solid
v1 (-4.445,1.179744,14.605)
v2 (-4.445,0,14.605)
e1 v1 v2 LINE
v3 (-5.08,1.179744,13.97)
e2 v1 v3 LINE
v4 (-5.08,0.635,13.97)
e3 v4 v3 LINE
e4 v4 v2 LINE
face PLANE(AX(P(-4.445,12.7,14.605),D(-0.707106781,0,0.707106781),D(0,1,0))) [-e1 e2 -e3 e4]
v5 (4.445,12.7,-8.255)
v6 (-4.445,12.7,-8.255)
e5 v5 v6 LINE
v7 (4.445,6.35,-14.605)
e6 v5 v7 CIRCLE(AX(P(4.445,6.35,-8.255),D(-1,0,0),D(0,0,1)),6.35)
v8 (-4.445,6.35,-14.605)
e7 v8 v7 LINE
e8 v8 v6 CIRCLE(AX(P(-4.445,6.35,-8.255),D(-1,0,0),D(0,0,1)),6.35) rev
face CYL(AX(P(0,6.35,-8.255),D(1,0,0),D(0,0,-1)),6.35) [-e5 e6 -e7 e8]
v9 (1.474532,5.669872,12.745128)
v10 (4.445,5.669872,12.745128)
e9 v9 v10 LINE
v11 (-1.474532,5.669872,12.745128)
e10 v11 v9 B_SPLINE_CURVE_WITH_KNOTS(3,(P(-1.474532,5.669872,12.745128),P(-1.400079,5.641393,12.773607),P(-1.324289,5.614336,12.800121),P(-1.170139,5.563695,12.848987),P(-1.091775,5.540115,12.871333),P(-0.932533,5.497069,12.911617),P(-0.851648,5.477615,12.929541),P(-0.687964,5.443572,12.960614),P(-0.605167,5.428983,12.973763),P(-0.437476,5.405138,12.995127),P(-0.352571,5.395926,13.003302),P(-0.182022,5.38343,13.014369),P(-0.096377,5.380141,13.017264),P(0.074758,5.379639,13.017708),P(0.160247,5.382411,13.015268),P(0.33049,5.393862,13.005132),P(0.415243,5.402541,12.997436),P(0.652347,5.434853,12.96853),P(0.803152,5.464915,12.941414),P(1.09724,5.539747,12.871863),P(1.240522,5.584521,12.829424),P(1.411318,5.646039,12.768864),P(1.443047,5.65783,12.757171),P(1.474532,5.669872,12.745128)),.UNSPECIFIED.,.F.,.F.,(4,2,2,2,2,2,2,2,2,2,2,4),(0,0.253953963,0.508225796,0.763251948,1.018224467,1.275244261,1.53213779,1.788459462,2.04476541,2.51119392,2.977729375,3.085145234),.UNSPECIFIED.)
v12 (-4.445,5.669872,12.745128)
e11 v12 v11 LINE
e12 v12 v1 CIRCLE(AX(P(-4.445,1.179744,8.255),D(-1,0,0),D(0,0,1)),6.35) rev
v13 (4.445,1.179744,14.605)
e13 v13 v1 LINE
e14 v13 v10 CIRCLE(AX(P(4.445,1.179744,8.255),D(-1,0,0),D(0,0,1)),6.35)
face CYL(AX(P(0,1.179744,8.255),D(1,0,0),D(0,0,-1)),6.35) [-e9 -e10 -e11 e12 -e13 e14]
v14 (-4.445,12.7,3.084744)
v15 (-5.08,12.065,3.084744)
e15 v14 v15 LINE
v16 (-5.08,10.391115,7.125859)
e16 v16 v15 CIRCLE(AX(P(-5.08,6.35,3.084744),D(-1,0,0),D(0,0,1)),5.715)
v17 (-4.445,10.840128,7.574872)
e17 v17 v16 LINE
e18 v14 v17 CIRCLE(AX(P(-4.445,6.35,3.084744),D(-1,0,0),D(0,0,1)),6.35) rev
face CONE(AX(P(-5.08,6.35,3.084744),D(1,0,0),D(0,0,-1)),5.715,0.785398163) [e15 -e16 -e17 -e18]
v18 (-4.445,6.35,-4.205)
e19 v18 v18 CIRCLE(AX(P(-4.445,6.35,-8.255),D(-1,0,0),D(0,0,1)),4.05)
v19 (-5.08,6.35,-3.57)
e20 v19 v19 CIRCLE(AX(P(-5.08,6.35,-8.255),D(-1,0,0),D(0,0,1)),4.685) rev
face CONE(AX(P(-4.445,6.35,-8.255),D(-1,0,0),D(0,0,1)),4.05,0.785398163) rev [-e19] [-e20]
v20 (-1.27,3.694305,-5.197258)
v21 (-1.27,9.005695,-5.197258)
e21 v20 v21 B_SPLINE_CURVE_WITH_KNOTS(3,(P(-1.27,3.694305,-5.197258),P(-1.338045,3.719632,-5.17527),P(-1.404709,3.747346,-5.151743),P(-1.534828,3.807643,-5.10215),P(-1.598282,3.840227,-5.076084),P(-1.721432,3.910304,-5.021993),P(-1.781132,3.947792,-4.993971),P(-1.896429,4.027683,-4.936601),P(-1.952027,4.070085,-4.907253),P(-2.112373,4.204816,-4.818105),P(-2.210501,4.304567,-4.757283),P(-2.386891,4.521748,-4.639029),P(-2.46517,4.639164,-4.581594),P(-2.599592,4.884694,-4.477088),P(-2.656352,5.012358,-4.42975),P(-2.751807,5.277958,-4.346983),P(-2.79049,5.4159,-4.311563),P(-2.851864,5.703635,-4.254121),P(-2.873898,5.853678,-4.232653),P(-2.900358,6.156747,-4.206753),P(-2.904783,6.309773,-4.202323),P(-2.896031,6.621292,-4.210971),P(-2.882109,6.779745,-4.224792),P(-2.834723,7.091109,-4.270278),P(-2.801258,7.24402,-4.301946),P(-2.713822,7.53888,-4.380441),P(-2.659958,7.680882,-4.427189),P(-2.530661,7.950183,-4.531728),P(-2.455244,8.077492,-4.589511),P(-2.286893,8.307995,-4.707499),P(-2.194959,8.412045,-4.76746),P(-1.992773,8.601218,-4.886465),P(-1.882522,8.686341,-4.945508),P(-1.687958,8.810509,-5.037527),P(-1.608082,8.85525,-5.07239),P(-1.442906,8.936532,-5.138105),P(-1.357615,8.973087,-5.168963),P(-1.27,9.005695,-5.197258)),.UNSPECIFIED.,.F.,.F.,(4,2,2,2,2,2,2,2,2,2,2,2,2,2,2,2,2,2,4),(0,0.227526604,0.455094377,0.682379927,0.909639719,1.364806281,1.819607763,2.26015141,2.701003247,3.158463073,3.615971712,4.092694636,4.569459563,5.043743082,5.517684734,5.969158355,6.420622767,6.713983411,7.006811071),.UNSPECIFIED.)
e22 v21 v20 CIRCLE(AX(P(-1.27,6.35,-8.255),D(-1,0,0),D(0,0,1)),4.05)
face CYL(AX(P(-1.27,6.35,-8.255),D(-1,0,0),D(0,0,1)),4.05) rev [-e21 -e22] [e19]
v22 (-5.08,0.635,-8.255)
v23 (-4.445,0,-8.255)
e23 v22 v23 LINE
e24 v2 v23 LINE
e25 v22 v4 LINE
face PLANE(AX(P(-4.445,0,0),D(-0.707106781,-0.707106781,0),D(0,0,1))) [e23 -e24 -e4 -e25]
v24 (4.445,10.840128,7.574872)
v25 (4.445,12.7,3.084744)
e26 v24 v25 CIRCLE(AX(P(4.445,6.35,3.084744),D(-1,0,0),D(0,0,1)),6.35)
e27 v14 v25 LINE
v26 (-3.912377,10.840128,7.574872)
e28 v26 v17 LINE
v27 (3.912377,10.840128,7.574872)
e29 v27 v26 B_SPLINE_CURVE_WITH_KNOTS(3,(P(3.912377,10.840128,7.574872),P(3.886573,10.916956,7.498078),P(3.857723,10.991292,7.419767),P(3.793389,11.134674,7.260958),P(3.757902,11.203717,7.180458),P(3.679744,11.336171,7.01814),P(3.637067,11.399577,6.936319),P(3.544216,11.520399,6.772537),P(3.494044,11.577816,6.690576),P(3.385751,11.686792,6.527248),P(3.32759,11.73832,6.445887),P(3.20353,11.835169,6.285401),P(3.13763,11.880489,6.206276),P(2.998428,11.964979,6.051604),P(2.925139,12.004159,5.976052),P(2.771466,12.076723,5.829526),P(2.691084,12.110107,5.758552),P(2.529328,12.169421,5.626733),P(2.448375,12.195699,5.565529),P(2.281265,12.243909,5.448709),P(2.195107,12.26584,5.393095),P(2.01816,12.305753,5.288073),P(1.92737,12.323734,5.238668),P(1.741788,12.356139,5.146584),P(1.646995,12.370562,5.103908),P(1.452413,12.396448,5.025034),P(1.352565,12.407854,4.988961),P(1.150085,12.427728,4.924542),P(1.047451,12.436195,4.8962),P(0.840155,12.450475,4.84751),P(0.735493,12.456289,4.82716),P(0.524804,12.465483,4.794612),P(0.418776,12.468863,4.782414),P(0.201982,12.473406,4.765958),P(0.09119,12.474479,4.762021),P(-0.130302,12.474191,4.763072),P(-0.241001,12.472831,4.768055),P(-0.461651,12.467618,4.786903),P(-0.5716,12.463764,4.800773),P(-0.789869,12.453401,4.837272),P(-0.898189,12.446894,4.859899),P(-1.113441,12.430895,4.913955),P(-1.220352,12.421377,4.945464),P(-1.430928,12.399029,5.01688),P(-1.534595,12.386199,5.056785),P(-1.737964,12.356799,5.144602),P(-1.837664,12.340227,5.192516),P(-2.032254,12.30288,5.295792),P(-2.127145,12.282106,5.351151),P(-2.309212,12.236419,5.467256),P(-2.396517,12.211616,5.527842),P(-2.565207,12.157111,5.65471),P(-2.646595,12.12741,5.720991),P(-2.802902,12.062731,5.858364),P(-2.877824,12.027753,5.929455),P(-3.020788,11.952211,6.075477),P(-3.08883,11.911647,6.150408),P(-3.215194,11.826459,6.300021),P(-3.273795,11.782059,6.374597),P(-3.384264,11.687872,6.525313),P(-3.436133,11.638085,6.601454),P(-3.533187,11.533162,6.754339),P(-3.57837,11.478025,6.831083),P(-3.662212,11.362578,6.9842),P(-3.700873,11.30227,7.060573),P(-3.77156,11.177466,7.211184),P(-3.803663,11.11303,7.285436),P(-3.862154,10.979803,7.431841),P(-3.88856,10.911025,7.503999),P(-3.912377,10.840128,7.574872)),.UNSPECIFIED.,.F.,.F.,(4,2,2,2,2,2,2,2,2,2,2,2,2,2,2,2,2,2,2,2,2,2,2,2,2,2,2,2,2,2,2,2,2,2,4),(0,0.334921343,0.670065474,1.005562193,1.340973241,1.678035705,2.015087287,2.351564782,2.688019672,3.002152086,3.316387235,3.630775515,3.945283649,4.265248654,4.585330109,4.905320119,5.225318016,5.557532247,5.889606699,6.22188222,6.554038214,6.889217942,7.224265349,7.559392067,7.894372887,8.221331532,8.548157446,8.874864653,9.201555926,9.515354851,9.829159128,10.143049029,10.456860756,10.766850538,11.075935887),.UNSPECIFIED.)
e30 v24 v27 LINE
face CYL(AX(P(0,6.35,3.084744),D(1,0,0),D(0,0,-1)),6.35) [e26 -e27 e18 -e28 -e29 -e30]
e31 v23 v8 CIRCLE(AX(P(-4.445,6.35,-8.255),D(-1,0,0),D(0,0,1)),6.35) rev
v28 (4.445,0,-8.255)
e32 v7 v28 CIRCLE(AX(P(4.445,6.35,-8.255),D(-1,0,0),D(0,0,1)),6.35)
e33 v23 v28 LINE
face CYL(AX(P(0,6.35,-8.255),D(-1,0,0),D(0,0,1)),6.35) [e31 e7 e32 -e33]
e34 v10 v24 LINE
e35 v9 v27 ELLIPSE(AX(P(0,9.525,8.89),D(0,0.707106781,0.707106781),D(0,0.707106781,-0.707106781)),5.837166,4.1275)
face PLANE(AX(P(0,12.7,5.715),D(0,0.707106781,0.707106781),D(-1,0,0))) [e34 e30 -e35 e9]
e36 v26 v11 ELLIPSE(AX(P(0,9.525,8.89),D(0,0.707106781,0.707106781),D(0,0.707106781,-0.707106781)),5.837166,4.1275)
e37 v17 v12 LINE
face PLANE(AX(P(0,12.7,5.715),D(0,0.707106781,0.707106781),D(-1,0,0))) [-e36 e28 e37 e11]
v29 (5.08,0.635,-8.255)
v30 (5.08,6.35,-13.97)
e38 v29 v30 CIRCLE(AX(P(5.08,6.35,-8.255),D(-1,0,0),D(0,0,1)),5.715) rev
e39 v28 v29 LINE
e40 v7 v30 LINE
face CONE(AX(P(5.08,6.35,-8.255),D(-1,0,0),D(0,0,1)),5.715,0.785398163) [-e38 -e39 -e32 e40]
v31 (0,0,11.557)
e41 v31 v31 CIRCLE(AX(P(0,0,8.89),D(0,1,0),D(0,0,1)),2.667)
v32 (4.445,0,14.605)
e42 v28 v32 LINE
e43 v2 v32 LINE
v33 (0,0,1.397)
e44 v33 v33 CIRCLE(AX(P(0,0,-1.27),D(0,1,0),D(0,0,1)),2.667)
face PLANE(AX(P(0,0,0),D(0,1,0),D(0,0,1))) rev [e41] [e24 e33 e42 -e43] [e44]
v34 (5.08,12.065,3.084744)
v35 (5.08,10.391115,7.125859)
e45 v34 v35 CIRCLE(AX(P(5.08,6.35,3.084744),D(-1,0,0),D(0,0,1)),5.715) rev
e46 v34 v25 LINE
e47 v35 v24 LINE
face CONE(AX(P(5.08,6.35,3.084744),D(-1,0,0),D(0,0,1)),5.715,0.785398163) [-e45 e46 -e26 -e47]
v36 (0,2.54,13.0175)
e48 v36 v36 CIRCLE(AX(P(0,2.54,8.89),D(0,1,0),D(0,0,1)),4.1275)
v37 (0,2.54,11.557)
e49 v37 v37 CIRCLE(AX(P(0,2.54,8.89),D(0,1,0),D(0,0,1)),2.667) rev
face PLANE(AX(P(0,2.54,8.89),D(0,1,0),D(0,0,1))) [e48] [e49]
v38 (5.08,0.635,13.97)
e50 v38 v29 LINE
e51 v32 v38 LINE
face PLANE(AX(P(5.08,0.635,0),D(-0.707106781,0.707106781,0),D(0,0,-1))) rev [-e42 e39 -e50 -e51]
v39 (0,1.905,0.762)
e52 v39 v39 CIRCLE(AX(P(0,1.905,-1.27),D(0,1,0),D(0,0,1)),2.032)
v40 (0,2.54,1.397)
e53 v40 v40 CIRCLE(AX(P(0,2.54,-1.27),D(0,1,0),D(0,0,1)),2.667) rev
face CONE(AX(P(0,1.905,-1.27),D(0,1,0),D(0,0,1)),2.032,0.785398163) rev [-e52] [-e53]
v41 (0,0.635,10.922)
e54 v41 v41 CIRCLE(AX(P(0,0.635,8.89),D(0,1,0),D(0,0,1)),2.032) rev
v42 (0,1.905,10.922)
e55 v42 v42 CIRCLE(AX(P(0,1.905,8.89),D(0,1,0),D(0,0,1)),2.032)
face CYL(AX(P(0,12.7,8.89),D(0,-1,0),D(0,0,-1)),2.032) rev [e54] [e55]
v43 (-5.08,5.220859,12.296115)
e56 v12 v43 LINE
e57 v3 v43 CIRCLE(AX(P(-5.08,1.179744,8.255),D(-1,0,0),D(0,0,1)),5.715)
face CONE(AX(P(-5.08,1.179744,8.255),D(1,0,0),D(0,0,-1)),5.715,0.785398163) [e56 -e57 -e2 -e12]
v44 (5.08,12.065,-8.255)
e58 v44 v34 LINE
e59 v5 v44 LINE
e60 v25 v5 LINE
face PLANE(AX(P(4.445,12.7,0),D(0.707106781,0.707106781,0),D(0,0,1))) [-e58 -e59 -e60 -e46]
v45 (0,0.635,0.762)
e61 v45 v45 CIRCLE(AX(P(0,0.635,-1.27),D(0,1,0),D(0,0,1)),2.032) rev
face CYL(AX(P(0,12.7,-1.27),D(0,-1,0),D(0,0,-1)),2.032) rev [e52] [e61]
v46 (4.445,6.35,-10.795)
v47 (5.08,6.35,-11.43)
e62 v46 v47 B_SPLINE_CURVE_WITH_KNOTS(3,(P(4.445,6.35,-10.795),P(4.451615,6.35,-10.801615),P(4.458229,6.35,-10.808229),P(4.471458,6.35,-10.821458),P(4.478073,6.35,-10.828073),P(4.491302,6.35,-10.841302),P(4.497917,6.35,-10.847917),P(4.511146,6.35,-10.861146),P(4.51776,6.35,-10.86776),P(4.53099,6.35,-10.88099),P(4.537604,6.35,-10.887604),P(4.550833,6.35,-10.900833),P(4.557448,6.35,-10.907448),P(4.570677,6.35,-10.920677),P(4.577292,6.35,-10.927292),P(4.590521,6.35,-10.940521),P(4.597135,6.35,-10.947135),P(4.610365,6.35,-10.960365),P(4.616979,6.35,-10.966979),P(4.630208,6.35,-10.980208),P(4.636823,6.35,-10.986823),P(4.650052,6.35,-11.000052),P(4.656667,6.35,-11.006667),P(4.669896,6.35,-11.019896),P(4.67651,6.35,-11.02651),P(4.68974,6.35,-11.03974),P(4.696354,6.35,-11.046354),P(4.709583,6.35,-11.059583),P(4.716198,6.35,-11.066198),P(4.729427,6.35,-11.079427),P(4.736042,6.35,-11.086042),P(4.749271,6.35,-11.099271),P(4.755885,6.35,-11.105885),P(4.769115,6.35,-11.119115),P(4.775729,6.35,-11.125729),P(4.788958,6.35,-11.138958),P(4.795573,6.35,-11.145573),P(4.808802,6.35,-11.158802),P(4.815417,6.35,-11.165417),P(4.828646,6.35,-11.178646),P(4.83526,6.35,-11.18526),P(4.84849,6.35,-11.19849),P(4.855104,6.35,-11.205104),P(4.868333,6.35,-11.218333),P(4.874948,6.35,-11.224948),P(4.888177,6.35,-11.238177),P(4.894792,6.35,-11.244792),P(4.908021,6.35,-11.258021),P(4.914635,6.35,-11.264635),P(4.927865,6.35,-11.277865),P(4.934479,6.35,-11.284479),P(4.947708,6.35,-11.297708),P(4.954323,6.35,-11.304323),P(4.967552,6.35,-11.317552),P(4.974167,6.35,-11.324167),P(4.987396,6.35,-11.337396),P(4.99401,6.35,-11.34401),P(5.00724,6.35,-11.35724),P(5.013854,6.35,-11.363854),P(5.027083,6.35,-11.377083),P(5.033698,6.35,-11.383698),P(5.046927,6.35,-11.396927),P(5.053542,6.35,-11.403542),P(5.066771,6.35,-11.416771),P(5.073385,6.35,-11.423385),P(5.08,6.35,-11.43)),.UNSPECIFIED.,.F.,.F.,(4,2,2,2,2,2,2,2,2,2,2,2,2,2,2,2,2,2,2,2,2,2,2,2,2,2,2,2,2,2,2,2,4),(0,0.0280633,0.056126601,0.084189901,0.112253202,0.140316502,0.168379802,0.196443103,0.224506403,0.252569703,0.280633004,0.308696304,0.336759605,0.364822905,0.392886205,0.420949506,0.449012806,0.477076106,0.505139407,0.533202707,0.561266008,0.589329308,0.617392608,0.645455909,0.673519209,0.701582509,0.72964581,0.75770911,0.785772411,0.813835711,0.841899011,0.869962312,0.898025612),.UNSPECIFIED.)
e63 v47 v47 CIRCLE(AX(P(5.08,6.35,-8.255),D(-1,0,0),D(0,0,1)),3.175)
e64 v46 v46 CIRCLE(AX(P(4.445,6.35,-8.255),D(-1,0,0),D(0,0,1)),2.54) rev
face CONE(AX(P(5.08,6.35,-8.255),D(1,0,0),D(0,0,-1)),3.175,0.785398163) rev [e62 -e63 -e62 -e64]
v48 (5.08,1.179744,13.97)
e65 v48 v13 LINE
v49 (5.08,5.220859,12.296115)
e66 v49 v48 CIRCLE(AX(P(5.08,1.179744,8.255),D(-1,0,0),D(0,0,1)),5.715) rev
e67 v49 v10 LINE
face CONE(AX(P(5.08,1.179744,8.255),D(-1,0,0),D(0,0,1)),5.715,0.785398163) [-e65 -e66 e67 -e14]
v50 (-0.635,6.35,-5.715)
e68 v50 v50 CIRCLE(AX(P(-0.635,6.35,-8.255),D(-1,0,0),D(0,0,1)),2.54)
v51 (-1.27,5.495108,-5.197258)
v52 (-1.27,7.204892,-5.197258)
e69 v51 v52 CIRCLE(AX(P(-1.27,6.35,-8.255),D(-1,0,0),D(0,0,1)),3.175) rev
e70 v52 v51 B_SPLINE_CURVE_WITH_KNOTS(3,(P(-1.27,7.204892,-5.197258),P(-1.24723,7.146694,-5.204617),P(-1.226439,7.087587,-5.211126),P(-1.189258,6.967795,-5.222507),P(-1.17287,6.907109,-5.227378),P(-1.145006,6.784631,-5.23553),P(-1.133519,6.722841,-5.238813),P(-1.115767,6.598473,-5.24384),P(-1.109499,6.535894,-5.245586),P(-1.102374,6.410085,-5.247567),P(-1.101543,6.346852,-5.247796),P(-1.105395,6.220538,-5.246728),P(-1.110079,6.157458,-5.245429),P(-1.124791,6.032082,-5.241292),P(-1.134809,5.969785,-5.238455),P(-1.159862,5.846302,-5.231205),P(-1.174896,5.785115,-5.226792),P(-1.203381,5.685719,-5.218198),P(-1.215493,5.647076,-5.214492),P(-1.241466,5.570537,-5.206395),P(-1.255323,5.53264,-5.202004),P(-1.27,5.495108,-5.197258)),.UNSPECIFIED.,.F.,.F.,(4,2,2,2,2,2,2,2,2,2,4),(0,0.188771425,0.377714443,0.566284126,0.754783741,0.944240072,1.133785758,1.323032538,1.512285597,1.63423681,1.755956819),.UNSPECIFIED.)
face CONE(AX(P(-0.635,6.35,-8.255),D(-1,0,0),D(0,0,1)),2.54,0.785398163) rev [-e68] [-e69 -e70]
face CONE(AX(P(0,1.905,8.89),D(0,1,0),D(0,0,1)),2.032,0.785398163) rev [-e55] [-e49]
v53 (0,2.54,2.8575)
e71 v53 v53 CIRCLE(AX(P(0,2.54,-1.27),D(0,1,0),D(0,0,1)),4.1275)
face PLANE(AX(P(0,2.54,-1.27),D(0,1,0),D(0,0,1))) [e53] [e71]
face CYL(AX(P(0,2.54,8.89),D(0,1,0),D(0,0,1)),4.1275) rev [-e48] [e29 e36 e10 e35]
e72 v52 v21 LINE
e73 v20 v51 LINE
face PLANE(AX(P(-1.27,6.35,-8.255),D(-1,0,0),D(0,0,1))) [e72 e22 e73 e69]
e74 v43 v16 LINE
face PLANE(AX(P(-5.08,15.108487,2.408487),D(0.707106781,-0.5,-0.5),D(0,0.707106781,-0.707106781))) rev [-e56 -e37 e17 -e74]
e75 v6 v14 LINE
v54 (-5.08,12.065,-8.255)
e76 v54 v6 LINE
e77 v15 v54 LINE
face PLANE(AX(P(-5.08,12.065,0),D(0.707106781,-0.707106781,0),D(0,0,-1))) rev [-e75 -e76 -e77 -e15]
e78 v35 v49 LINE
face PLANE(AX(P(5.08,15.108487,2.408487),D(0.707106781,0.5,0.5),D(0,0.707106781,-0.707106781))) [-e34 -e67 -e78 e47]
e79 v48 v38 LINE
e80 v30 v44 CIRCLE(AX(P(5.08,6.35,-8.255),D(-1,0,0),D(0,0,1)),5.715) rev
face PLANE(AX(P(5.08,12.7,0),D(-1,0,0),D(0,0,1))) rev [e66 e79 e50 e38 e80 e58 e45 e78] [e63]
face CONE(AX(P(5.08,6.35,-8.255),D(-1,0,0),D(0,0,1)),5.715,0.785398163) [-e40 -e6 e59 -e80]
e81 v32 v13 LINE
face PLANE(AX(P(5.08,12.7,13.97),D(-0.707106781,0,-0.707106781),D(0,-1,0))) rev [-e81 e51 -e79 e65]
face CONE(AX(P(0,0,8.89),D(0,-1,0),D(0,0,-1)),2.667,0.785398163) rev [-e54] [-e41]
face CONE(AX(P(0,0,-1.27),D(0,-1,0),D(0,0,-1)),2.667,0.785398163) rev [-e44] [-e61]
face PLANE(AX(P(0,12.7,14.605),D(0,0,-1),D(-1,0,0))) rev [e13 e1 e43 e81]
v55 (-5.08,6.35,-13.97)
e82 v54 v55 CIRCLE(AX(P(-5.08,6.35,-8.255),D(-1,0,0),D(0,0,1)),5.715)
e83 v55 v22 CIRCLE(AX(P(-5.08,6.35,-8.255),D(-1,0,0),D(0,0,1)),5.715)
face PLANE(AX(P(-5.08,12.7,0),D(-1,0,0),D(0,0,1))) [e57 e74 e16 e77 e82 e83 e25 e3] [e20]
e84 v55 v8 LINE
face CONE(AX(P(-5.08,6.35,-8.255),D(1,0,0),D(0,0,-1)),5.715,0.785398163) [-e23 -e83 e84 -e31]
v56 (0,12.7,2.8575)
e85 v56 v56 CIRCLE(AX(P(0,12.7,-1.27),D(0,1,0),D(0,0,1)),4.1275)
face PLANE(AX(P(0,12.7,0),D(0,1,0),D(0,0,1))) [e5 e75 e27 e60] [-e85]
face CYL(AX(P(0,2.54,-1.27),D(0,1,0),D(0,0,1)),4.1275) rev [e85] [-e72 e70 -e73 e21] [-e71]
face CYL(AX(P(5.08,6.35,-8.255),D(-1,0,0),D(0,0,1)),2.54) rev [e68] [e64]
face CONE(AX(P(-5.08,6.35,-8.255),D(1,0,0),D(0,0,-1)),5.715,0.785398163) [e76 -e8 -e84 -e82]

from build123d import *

# Parameters (mm, degrees)
SKETCH1_W           = 10.16
SKETCH1_H           = 29.21
SKETCH1_R           = 2.032
SKETCH1_R_2         = 4.1275
BOSS_EXTRUDE1_DEPTH = 12.7
SKETCH1_3_R         = 2.032
CUT_EXTRUDE2_DEPTH  = 21.010058096
CUT_EXTRUDE3_START  = 2.54
SKETCH1_4_R         = 4.1275
SKETCH1_4_R_2       = 2.032
CUT_EXTRUDE3_DEPTH  = 10.16
SKETCH2_R           = 4.05
CUT_EXTRUDE1_DEPTH  = 3.81
SKETCH3_R           = 2.54
CUT_EXTRUDE4_DEPTH  = 22.859131445
CHAMFER1_SIZE       = 8.89
FILLET1_R           = 6.35
FILLET2_R           = 6.35
CHAMFER2_SIZE       = 0.635


# Some blends are built 0.0001 mm under size
with BuildPart() as part:
    # Sketch1 → Boss-Extrude1 (new body)
    # profile 1 of 5: a face of its own
    with BuildSketch(Plane(origin=(0, 0, 0), x_dir=(1, 0, 0), z_dir=(0, 1, 0))):
        Rectangle(SKETCH1_W, SKETCH1_H)
        with Locations((0, -8.89)):
            Circle(SKETCH1_R, mode=Mode.SUBTRACT)
        with Locations((0, 1.27)):
            Circle(SKETCH1_R, mode=Mode.SUBTRACT)
    # profile 2 of 5: a face of its own
    with BuildSketch(Plane(origin=(0, 0, 0), x_dir=(1, 0, 0), z_dir=(0, 1, 0))):
        with Locations((0, 1.27)):
            Circle(SKETCH1_R_2)
        with Locations((0, 1.27)):
            Circle(SKETCH1_R, mode=Mode.SUBTRACT)
    # profile 3 of 5: a face of its own
    with BuildSketch(Plane(origin=(0, 0, 0), x_dir=(1, 0, 0), z_dir=(0, 1, 0))):
        with Locations((0, 1.27)):
            Circle(SKETCH1_R)
    # profile 4 of 5: a face of its own
    with BuildSketch(Plane(origin=(0, 0, 0), x_dir=(1, 0, 0), z_dir=(0, 1, 0))):
        with Locations((0, -8.89)):
            Circle(SKETCH1_R_2)
        with Locations((0, -8.89)):
            Circle(SKETCH1_R, mode=Mode.SUBTRACT)
    # profile 5 of 5: a face of its own
    with BuildSketch(Plane(origin=(0, 0, 0), x_dir=(1, 0, 0), z_dir=(0, 1, 0))):
        with Locations((0, -8.89)):
            Circle(SKETCH1_R)
    extrude(amount=BOSS_EXTRUDE1_DEPTH)

    # Sketch1<3> → Cut-Extrude2 (cut, through all)
    with BuildSketch(Plane(origin=(0, 0, 0), x_dir=(1, 0, 0), z_dir=(0, 1, 0))):
        with Locations(Location((0, 1.27, 0), (0, 0, 270))):
            Circle(SKETCH1_3_R)
        with Locations(Location((0, -8.89, 0), (0, 0, 270))):
            Circle(SKETCH1_3_R)
    extrude(amount=CUT_EXTRUDE2_DEPTH, mode=Mode.SUBTRACT)

    # Sketch1<4> → Cut-Extrude3 (cut)
    # profile 1 of 2: a face of its own
    with BuildSketch(Plane(origin=(0, 0, 0), x_dir=(1, 0, 0), z_dir=(0, 1, 0)).offset(CUT_EXTRUDE3_START)):
        with Locations(Location((0, -8.89, 0), (0, 0, 270))):
            Circle(SKETCH1_4_R)
        with Locations(Location((0, -8.89, 0), (0, 0, 270))):
            Circle(SKETCH1_4_R_2, mode=Mode.SUBTRACT)
    # profile 2 of 2: a face of its own
    with BuildSketch(Plane(origin=(0, 0, 0), x_dir=(1, 0, 0), z_dir=(0, 1, 0)).offset(CUT_EXTRUDE3_START)):
        with Locations(Location((0, 1.27, 0), (0, 0, 270))):
            Circle(SKETCH1_4_R)
        with Locations(Location((0, 1.27, 0), (0, 0, 270))):
            Circle(SKETCH1_4_R_2, mode=Mode.SUBTRACT)
    extrude(amount=CUT_EXTRUDE3_DEPTH, mode=Mode.SUBTRACT)

    # Sketch2 → Cut-Extrude1 (cut)
    with BuildSketch(Plane.ZY.offset(5.08)):
        with Locations((-8.255, 6.35)):
            Circle(SKETCH2_R)
    extrude(amount=-CUT_EXTRUDE1_DEPTH, mode=Mode.SUBTRACT)

    # Sketch3 → Cut-Extrude4 (cut, through all)
    with BuildSketch(Plane.ZY.offset(5.08)):
        with Locations((-8.255, 6.35)):
            Circle(SKETCH3_R)
    extrude(amount=-CUT_EXTRUDE4_DEPTH, mode=Mode.SUBTRACT)

    # Chamfer1
    # the kernel refuses this chamfer: 8.89 mm, written as the material it takes off along each edge
    with BuildSketch(Plane(origin=(-27.942261763, 12.7, 14.605), x_dir=(0, -0.9996219169112966, 0.027495876610586317), z_dir=(1, 0, 0))) as chamfer1_piece_1:
        Polygon((CHAMFER1_SIZE * 0.999621916911, CHAMFER1_SIZE * 0.0274958766106), (-CHAMFER1_SIZE * 0.0274958766106, CHAMFER1_SIZE * 0.999621916911), (0, 0), align=None)
    extrude(amount=55.884523526, mode=Mode.SUBTRACT)

    # Fillet1
    # the kernel refuses this fillet: 6.35 mm, written as the material it takes off along each edge
    with BuildSketch(Plane(origin=(-11.655640303, 3.81, 14.605), x_dir=(0, -1, 0), z_dir=(1, 0, 0))) as fillet1_piece_1:
        with BuildLine():
            CenterArc((FILLET1_R * 0.414213562373, FILLET1_R), FILLET1_R, 225, 45)
            Line((-FILLET1_R * 0.292893218814, FILLET1_R * 0.292893218814), (0, 0))
            Line((0, 0), (FILLET1_R * 0.414213562373, 0))
        make_face()
    extrude(amount=23.311280605, mode=Mode.SUBTRACT)
    with BuildSketch(Plane(origin=(-11.655640303, 12.7, 5.715), x_dir=(0, -0.7071067811862649, 0.7071067811868301), z_dir=(1, 0, 0)), Plane(origin=(-3.938287226, 12.7, 5.715), x_dir=(0, -0.7071067811862649, 0.7071067811868301), z_dir=(1, 0, 0))) as fillet1_piece_2:
        with BuildLine():
            CenterArc((FILLET1_R * 0.414213562373, FILLET1_R), FILLET1_R, 225, 45)
            Line((-FILLET1_R * 0.292893218813, FILLET1_R * 0.292893218813), (0, 0))
            Line((0, 0), (FILLET1_R * 0.414213562373, 0))
        make_face()
    extrude(amount=15.593927529, mode=Mode.SUBTRACT)

    # Fillet2
    fillet2_edges = [part.edges().sort_by_distance(p)[0] for p in [
        (0, 12.7, -14.605),
        (0, 0, -14.605),
    ]]
    fillet(fillet2_edges, radius=FILLET2_R - 0.0001)  # a hair under: the kernel refuses the full size

    # Chamfer2
    # the kernel refuses this chamfer: 0.635 mm, written as the material it takes off along each edge
    with BuildSketch(Plane(origin=(0, 0, -1.27), x_dir=(0, 0, 1), z_dir=(-1, 0, 0))) as chamfer2_piece_1:
        Polygon((2.032 + CHAMFER2_SIZE, 0), (2.032, CHAMFER2_SIZE), (2.032, 0), align=None)
    revolve(axis=Axis((0, 0, -1.27), (0, 1, 0)), mode=Mode.SUBTRACT)
    with BuildSketch(Plane(origin=(0, 0, 8.89), x_dir=(0, 0, 1), z_dir=(-1, 0, 0))) as chamfer2_piece_2:
        Polygon((2.032 + CHAMFER2_SIZE, 0), (2.032, CHAMFER2_SIZE), (2.032, 0), align=None)
    revolve(axis=Axis((0, 0, 8.89), (0, 1, 0)), mode=Mode.SUBTRACT)
    with BuildSketch(Plane(origin=(0, 2.54, 8.89), x_dir=(0, 0, 1), z_dir=(-1, 0, 0))) as chamfer2_piece_3:
        Polygon((2.032, -CHAMFER2_SIZE), (2.032 + CHAMFER2_SIZE, 0), (2.032, 0), align=None)
    revolve(axis=Axis((0, 2.54, 8.89), (0, 1, 0)), mode=Mode.SUBTRACT)
    with BuildSketch(Plane(origin=(0, 2.54, -1.27), x_dir=(0, 0, 1), z_dir=(-1, 0, 0))) as chamfer2_piece_4:
        Polygon((2.032, -CHAMFER2_SIZE), (2.032 + CHAMFER2_SIZE, 0), (2.032, 0), align=None)
    revolve(axis=Axis((0, 2.54, -1.27), (0, 1, 0)), mode=Mode.SUBTRACT)
    with BuildSketch(Plane(origin=(-5.08, 6.35, -8.255), x_dir=(0, 0, 1), z_dir=(0, -1, 0))) as chamfer2_piece_5:
        Polygon((4.05 + CHAMFER2_SIZE, 0), (4.05, -CHAMFER2_SIZE), (4.05, 0), align=None)
    revolve(axis=Axis((-5.08, 6.35, -8.255), (-1, 0, 0)), mode=Mode.SUBTRACT)
    with BuildSketch(Plane(origin=(-1.27, 6.35, -8.255), x_dir=(0, 0, 1), z_dir=(0, -1, 0))) as chamfer2_piece_6:
        Polygon((2.54 + CHAMFER2_SIZE, 0), (2.54, -CHAMFER2_SIZE), (2.54, 0), align=None)
    revolve(axis=Axis((-1.27, 6.35, -8.255), (-1, 0, 0)), mode=Mode.SUBTRACT)
    with BuildSketch(Plane(origin=(5.08, 6.35, -8.255), x_dir=(0, 0, 1), z_dir=(0, -1, 0))) as chamfer2_piece_7:
        Polygon((2.54 + CHAMFER2_SIZE, 0), (2.54, CHAMFER2_SIZE), (2.54, 0), align=None)
    revolve(axis=Axis((5.08, 6.35, -8.255), (-1, 0, 0)), mode=Mode.SUBTRACT)
    with BuildSketch(Plane(origin=(-5.08, 0, -8.2551), x_dir=(-0.027495876610585925, 0.9996219169112968, 0), z_dir=(0, 0, 1))) as chamfer2_piece_8:
        Polygon((CHAMFER2_SIZE * 0.999621916911, -CHAMFER2_SIZE * 0.0274958766106), (-CHAMFER2_SIZE * 0.0274958766106, -CHAMFER2_SIZE * 0.999621916911), (0, 0), align=None)
    extrude(amount=24.493118697, mode=Mode.SUBTRACT)
    with BuildSketch(Plane(origin=(5.08, -1.633018697, 14.605), x_dir=(-0.9996219169112966, 0, 0.027495876610587302), z_dir=(0, 1, 0)), Plane(origin=(-5.08, -1.633018697, 14.605), x_dir=(-0.027495876610585834, 0, -0.9996219169112968), z_dir=(0, 1, 0))) as chamfer2_piece_9:
        Polygon((CHAMFER2_SIZE * 0.999621916911, -CHAMFER2_SIZE * 0.0274958766106), (-CHAMFER2_SIZE * 0.0274958766106, -CHAMFER2_SIZE * 0.999621916911), (0, 0), align=None)
    extrude(amount=2.812762576, mode=Mode.SUBTRACT)
    with BuildSketch(Plane(origin=(-5.08, 10.840128061, 7.574871939), x_dir=(-0.027495876610587233, -0.706839436070956, -0.7068394360703909), z_dir=(0, -0.7071067811862648, 0.7071067811868302)), Plane(origin=(5.08, 5.669871939, 12.745128061), x_dir=(0.02749587661058726, -0.7068394360709561, -0.7068394360703909), z_dir=(0, 0.7071067811862648, -0.7071067811868302))) as chamfer2_piece_10:
        Polygon((CHAMFER2_SIZE * 0.999621916911, CHAMFER2_SIZE * 0.0274958766106), (-CHAMFER2_SIZE * 0.0274958766106, CHAMFER2_SIZE * 0.999621916911), (0, 0), align=None)
    extrude(amount=7.311846327, mode=Mode.SUBTRACT)
    with BuildSketch(Plane(origin=(-5.08, 12.7, -8.2551), x_dir=(-0.02749587661058591, -0.9996219169112968, 0), z_dir=(0, 0, 1))) as chamfer2_piece_11:
        Polygon((CHAMFER2_SIZE * 0.999621916911, CHAMFER2_SIZE * 0.0274958766106), (-CHAMFER2_SIZE * 0.0274958766106, CHAMFER2_SIZE * 0.999621916911), (0, 0), align=None)
    extrude(amount=11.339843879, mode=Mode.SUBTRACT)
    with BuildSketch(Plane(origin=(-5.08, 6.35, 3.084743879), x_dir=(0, 0.7071067811870476, 0.7071067811860474), z_dir=(0, -0.7071067811860474, 0.7071067811870476))) as chamfer2_piece_12:
        Polygon((6.35 - CHAMFER2_SIZE, 0), (6.35, -CHAMFER2_SIZE), (6.35, 0), align=None)
    revolve(axis=Axis((-5.08, 6.35, 3.084743879), (-1, 0, 0)), revolution_arc=45, mode=Mode.SUBTRACT)
    with BuildSketch(Plane(origin=(5.08, 0, 16.238018697), x_dir=(-0.9996219169112966, -0.0274958766105864, 0), z_dir=(0, 0, -1))) as chamfer2_piece_13:
        Polygon((CHAMFER2_SIZE * 0.999621916911, CHAMFER2_SIZE * 0.0274958766106), (-CHAMFER2_SIZE * 0.0274958766106, CHAMFER2_SIZE * 0.999621916911), (0, 0), align=None)
    extrude(amount=24.493118697, mode=Mode.SUBTRACT)
    with BuildSketch(Plane(origin=(-5.08, 1.179743879, 8.255), x_dir=(0, 0, 1), z_dir=(0, -1, 0))) as chamfer2_piece_14:
        Polygon((6.35 - CHAMFER2_SIZE, 0), (6.35, -CHAMFER2_SIZE), (6.35, 0), align=None)
    revolve(axis=Axis((-5.08, 1.179743879, 8.255), (-1, 0, 0)), revolution_arc=45, mode=Mode.SUBTRACT)
    with BuildSketch(Plane(origin=(5.08, 12.7, 3.084743879), x_dir=(-0.9996219169112966, 0.027495876610587302, 0), z_dir=(0, 0, -1))) as chamfer2_piece_15:
        Polygon((CHAMFER2_SIZE * 0.999621916911, -CHAMFER2_SIZE * 0.0274958766106), (-CHAMFER2_SIZE * 0.0274958766106, -CHAMFER2_SIZE * 0.999621916911), (0, 0), align=None)
    extrude(amount=11.339843879, mode=Mode.SUBTRACT)
    with BuildSketch(Plane(origin=(5.08, 6.35, 3.084743879), x_dir=(0, 0.7071067811870476, 0.7071067811860474), z_dir=(0, -0.7071067811860474, 0.7071067811870476))) as chamfer2_piece_16:
        Polygon((6.35, CHAMFER2_SIZE), (6.35 - CHAMFER2_SIZE, 0), (6.35, 0), align=None)
    revolve(axis=Axis((5.08, 6.35, 3.084743879), (-1, 0, 0)), revolution_arc=45, mode=Mode.SUBTRACT)
    with BuildSketch(Plane(origin=(5.08, 1.179743879, 8.255), x_dir=(0, 0, 1), z_dir=(0, -1, 0))) as chamfer2_piece_17:
        Polygon((6.35, CHAMFER2_SIZE), (6.35 - CHAMFER2_SIZE, 0), (6.35, 0), align=None)
    revolve(axis=Axis((5.08, 1.179743879, 8.255), (-1, 0, 0)), revolution_arc=45, mode=Mode.SUBTRACT)
    with BuildSketch(Plane(origin=(5.08, 6.3501, -8.2551), x_dir=(0, 0, -1), z_dir=(0, -1, 0))) as chamfer2_piece_18:
        Polygon((6.3499, -CHAMFER2_SIZE), (6.3499 - CHAMFER2_SIZE, 0), (6.3499, 0), align=None)
    revolve(axis=Axis((5.08, 6.3501, -8.2551), (1, 0, 0)), revolution_arc=90, mode=Mode.SUBTRACT)
    with BuildSketch(Plane(origin=(5.08, 6.3499, -8.2551), x_dir=(0, 0, -1), z_dir=(0, 1, 0))) as chamfer2_piece_19:
        Polygon((6.3499, CHAMFER2_SIZE), (6.3499 - CHAMFER2_SIZE, 0), (6.3499, 0), align=None)
    revolve(axis=Axis((5.08, 6.3499, -8.2551), (-1, 0, 0)), revolution_arc=90, mode=Mode.SUBTRACT)
    with BuildSketch(Plane(origin=(-5.08, 6.3501, -8.2551), x_dir=(0, 0, -1), z_dir=(0, -1, 0))) as chamfer2_piece_20:
        Polygon((6.3499 - CHAMFER2_SIZE, 0), (6.3499, CHAMFER2_SIZE), (6.3499, 0), align=None)
    revolve(axis=Axis((-5.08, 6.3501, -8.2551), (1, 0, 0)), revolution_arc=90, mode=Mode.SUBTRACT)
    with BuildSketch(Plane(origin=(-5.08, 6.3499, -8.2551), x_dir=(0, 0, -1), z_dir=(0, 1, 0))) as chamfer2_piece_21:
        Polygon((6.3499 - CHAMFER2_SIZE, 0), (6.3499, -CHAMFER2_SIZE), (6.3499, 0), align=None)
    revolve(axis=Axis((-5.08, 6.3499, -8.2551), (-1, 0, 0)), revolution_arc=90, mode=Mode.SUBTRACT)
    with BuildSketch(Plane(origin=(-5.08, 6.3499, -14.605), x_dir=(-0.02749587661058591, 0, 0.9996219169112968), z_dir=(0, 1, 0)), Plane(origin=(5.08, 6.3499, -14.605), x_dir=(-0.9996219169112966, 0, -0.027495876610587302), z_dir=(0, 1, 0))) as chamfer2_piece_22:
        Polygon((CHAMFER2_SIZE * 0.999621916911, CHAMFER2_SIZE * 0.0274958766106), (-CHAMFER2_SIZE * 0.0274958766106, CHAMFER2_SIZE * 0.999621916911), (0, 0), align=None)
    extrude(amount=0.0002, mode=Mode.SUBTRACT)


solid = part.part
